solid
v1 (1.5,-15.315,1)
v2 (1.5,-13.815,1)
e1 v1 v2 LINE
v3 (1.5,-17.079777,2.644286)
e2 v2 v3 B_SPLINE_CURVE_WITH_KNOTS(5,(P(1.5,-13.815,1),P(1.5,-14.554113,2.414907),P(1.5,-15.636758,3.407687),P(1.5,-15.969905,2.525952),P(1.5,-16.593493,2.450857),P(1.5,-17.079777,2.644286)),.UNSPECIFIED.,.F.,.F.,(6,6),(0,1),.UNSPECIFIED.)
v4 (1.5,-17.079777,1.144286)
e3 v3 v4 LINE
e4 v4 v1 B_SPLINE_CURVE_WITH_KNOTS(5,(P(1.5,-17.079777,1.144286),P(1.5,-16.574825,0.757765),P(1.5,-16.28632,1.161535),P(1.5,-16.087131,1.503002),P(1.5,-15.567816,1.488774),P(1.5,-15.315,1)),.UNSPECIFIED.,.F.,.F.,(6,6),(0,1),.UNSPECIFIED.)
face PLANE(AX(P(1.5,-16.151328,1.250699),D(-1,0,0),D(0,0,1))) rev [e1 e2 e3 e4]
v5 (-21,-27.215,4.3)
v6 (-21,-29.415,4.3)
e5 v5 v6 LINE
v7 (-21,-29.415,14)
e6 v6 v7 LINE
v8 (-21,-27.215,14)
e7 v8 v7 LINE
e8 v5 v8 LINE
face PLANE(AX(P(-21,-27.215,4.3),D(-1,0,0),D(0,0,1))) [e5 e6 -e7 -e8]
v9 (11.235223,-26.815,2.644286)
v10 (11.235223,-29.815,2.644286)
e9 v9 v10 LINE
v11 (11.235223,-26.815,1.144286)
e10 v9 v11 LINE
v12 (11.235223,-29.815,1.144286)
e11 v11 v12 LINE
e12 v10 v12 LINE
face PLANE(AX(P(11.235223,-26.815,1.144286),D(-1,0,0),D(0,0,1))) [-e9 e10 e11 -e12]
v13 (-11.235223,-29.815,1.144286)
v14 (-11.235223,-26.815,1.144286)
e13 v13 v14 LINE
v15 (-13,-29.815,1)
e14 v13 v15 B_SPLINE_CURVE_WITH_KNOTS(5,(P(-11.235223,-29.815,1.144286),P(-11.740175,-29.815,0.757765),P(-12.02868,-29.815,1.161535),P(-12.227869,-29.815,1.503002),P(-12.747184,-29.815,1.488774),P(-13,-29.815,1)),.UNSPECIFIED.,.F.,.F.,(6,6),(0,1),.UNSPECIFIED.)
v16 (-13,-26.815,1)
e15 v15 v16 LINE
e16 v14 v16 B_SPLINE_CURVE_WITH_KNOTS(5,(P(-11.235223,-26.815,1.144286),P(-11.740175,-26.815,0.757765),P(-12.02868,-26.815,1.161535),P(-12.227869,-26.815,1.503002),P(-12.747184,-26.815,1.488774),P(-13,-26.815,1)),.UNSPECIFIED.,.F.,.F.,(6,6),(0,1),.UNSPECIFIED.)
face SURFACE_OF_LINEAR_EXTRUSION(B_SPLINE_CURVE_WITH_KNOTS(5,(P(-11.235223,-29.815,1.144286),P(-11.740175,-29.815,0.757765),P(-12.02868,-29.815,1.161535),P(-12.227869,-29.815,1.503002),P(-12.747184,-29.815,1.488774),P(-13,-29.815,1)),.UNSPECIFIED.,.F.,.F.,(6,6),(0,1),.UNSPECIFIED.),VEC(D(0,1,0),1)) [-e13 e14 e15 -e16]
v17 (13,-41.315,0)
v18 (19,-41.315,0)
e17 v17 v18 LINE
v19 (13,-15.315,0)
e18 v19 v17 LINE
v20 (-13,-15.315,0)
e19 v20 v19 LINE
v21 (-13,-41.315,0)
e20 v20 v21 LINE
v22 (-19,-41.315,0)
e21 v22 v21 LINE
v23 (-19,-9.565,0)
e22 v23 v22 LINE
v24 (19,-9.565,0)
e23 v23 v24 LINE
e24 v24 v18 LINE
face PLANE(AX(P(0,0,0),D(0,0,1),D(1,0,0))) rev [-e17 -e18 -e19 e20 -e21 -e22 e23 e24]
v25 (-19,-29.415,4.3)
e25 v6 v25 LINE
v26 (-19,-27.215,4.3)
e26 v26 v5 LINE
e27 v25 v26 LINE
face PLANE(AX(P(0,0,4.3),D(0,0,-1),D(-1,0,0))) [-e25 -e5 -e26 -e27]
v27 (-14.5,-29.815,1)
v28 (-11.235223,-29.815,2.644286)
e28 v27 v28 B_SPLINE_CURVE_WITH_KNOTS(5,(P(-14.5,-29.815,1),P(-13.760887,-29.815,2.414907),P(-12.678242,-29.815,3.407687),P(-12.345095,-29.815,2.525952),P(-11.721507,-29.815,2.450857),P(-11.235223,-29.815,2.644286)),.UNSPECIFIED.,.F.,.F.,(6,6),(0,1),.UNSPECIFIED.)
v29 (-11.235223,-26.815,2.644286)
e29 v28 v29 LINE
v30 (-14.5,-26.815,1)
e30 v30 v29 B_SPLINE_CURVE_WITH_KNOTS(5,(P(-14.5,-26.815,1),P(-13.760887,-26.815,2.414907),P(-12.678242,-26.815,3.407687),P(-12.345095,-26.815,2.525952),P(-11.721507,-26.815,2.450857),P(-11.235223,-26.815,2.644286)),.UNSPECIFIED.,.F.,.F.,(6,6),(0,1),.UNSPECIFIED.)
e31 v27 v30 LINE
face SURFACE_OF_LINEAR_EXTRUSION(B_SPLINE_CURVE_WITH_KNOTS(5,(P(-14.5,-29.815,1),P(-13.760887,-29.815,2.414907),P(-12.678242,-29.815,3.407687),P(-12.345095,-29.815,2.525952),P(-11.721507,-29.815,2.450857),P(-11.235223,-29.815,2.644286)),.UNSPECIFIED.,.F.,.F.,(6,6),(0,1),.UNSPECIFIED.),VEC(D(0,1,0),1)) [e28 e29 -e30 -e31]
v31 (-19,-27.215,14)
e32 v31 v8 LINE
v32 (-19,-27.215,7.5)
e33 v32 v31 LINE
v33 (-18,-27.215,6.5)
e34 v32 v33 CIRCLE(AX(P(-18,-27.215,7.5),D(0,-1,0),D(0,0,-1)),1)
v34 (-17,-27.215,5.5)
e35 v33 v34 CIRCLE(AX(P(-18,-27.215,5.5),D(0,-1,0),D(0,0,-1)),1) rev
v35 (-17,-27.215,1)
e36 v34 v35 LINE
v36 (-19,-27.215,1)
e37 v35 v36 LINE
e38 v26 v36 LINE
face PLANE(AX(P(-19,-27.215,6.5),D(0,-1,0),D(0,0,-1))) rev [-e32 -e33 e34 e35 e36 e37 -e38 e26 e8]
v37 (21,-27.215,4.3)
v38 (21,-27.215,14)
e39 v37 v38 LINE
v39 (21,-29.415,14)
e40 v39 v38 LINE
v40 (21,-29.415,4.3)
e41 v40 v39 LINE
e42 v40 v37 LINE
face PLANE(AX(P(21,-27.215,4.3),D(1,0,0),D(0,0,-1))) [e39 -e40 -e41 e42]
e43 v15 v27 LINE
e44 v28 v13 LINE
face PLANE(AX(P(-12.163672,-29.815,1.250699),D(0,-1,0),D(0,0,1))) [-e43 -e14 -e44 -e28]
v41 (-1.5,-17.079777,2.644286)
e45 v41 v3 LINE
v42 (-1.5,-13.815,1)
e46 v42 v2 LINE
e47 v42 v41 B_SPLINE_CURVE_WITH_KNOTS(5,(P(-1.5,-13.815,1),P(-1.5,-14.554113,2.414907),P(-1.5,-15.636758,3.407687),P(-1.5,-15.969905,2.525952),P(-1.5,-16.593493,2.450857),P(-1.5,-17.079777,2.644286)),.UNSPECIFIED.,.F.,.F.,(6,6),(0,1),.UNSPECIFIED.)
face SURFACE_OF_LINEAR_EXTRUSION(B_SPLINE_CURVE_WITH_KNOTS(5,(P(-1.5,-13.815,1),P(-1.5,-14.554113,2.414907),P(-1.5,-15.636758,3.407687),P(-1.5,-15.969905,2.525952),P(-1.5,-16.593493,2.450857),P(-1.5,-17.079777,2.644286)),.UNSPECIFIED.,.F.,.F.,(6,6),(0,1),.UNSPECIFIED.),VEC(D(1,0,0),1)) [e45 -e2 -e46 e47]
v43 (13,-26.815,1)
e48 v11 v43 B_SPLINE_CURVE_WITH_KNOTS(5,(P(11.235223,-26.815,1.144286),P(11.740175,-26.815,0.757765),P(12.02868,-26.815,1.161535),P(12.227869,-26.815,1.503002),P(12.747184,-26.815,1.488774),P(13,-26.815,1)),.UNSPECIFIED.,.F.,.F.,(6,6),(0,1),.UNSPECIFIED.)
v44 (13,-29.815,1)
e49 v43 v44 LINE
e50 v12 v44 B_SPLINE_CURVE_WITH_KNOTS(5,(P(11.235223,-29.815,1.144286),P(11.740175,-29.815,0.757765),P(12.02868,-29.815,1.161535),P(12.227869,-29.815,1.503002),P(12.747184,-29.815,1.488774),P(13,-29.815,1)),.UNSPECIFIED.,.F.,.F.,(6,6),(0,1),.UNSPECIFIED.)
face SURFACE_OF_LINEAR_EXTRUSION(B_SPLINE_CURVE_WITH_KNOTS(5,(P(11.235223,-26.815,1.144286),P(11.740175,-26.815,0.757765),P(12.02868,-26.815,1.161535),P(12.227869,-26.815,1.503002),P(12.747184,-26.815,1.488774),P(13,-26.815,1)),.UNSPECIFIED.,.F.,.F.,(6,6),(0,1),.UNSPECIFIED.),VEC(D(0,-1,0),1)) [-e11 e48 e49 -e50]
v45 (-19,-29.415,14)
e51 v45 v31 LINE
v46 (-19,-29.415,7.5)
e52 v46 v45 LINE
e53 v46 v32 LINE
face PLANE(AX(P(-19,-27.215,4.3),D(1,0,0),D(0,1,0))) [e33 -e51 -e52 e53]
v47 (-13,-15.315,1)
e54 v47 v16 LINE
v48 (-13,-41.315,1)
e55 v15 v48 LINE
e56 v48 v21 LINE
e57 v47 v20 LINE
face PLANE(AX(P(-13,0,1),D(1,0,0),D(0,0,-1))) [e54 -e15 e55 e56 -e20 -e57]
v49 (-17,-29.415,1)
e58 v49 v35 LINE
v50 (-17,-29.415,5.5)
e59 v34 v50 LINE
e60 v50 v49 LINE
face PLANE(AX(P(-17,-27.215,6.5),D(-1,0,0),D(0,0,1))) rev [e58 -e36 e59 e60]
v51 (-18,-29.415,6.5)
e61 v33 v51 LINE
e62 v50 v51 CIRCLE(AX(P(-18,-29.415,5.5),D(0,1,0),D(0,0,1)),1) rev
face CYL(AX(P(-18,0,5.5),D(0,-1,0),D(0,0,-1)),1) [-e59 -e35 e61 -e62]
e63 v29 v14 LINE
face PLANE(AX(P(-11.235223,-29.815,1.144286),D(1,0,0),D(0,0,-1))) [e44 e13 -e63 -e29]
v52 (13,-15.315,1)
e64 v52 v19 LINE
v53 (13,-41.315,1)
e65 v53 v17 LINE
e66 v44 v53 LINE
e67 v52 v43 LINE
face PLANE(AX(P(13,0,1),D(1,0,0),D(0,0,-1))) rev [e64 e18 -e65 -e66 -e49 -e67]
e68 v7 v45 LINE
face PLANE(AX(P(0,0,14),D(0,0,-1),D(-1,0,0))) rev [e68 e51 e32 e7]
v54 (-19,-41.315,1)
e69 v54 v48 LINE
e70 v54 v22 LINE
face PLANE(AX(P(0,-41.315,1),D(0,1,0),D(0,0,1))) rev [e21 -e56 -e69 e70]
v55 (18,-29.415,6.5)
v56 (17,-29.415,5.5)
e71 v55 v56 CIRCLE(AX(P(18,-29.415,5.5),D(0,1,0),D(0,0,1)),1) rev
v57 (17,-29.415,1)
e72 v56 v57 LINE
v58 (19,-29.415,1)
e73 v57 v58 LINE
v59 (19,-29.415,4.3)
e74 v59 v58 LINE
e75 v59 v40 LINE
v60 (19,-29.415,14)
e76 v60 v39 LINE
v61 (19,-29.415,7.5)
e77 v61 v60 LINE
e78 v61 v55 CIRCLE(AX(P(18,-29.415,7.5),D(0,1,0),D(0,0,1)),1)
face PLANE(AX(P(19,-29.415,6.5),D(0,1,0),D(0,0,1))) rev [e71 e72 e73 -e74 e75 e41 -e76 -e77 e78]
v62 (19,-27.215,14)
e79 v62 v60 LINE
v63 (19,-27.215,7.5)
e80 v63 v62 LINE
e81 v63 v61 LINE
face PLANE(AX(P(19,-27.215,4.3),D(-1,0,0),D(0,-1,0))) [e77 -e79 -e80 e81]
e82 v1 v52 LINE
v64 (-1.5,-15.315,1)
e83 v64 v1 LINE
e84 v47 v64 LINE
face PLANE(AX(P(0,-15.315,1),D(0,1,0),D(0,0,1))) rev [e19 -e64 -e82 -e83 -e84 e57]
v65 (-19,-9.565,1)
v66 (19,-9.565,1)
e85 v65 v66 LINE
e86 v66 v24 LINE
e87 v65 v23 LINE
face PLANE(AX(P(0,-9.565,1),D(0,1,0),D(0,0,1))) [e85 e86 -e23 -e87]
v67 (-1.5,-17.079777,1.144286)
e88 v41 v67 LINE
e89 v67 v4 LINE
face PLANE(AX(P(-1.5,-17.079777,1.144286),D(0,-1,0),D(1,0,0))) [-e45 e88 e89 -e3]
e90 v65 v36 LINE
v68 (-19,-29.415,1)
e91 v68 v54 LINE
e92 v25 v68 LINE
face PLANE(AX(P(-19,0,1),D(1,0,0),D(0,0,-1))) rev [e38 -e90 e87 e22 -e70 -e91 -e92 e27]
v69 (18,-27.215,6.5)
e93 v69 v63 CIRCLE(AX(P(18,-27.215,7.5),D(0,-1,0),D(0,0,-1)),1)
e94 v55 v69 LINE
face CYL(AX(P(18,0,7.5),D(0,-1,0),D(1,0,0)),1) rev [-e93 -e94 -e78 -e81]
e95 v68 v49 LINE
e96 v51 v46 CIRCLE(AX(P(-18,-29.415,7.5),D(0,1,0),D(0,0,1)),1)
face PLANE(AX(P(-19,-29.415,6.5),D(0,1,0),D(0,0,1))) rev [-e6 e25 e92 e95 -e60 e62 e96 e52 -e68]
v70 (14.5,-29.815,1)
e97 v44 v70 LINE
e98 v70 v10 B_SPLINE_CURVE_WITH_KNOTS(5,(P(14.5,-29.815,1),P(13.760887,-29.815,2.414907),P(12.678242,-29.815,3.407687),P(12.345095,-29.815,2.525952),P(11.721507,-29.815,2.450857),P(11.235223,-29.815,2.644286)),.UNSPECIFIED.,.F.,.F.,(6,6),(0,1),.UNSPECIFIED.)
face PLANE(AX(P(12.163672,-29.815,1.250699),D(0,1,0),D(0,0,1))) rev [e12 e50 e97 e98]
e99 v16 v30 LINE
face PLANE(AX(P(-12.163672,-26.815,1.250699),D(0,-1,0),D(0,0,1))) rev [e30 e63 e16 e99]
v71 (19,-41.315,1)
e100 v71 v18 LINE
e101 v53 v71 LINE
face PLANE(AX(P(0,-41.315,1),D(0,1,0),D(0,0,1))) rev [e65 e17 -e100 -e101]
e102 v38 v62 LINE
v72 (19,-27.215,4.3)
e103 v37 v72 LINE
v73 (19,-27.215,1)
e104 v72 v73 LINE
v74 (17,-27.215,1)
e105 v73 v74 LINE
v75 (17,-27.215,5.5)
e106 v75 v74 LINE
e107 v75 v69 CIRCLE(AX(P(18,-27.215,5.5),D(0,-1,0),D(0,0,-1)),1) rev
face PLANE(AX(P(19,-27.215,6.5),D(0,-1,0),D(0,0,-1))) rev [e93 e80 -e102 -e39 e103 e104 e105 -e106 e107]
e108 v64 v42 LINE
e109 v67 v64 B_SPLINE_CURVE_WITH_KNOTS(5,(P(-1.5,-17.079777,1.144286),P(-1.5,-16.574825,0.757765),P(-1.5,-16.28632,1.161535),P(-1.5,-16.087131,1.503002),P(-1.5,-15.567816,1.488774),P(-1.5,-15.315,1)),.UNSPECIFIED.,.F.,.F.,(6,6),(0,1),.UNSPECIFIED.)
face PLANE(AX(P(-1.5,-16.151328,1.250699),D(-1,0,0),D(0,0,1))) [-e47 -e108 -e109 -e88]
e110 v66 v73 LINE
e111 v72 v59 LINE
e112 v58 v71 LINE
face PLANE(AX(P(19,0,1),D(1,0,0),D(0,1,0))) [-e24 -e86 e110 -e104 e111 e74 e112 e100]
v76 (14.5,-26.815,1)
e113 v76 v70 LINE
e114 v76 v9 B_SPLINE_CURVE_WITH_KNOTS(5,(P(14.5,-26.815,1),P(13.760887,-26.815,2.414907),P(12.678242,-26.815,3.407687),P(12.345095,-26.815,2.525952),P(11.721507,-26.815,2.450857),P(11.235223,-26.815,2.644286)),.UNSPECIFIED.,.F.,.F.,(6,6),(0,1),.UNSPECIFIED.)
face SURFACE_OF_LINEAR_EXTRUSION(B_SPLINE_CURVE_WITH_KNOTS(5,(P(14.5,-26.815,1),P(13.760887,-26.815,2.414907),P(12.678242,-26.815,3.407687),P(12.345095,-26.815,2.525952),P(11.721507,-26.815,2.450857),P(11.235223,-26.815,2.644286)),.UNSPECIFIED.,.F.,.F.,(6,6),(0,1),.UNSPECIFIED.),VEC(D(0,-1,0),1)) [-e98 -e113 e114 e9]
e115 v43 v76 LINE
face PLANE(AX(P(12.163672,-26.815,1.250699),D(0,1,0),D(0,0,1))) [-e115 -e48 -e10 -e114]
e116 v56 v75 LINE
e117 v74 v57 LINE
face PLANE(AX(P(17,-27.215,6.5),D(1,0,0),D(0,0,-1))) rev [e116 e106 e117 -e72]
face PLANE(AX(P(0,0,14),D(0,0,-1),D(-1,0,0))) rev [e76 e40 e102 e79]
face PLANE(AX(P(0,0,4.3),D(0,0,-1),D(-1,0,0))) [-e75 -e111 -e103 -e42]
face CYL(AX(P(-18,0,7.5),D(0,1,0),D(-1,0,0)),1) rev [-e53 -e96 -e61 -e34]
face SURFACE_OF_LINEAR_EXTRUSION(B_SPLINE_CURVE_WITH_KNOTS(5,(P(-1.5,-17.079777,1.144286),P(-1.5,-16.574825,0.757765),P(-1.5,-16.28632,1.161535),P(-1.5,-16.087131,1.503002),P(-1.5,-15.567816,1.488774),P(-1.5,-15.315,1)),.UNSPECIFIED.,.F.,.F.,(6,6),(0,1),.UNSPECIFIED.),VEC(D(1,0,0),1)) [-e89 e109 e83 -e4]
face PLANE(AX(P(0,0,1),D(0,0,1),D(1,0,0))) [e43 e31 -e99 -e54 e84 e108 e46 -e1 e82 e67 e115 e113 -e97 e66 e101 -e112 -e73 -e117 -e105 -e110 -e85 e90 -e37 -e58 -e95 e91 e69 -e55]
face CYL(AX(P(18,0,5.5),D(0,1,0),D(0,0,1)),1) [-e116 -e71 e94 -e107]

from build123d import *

# Parameters (mm, degrees)
BOSS_EXTRUDE1_DEPTH      = 1
BOSS_EXTRUDE2_START      = -1.5
BOSS_EXTRUDE2_DEPTH      = 3
CIRPATTERN1_COUNT        = 3
CIRPATTERN1_ANGLE        = 180
SKETCH4_W                = 2
SKETCH4_H                = 2.2
BOSS_EXTRUDE3_DEPTH      = 5.5
BOSS_EXTRUDE4_DEPTH      = 7.5
BOSS_EXTRUDE4_DEPTH_BACK = 2.2
SKETCH5_W                = 2
SKETCH5_H                = 2.2
FILLET1_START            = -30
FILLET1_DEPTH            = 4
FILLET1_START_2          = -29.415
FILLET1_2_DEPTH          = 2.2


with BuildPart() as part:
    # Sketch1 → Boss-Extrude1 (new body)
    with BuildSketch(Plane.XY):
        Polygon((13, -9.565), (-13, -9.565), (-19, -9.565), (-19, -41.315), (-13, -41.315), (-13, -15.315), (13, -15.315), (13, -41.315), (19, -41.315), (19, -9.565), align=None)
    extrude(amount=BOSS_EXTRUDE1_DEPTH)

    # Boss-Extrude2: read off the stored shape, not the designer's step
    # Boss-Extrude2 outline → Boss-Extrude2 (add)
    with BuildSketch(Plane(origin=(0, -28.315, 0), x_dir=(-1, 0, 0), z_dir=(0, -1, 0)).offset(BOSS_EXTRUDE2_START)):
        with BuildLine():
            Line((-11.23522271, -2.644286359), (-11.23522271, -1.144286359))
            add(Edge.make_bspline(
                [(-11.23522271, -1.144286359), (-11.740174878, -0.757764956), (-12.028679887, -1.161534837), (-12.227869222, -1.503002268), (-12.747184273, -1.488774458), (-13, -1)],
                knots=[0, 0, 0, 0, 0, 0, 1, 1, 1, 1, 1, 1], degree=5))
            Line((-13, -1), (-14.5, -1))
            add(Edge.make_bspline(
                [(-14.5, -1), (-13.760887065, -2.414906572), (-12.67824158, -3.40768712), (-12.345095428, -2.525951835), (-11.7215069, -2.450856602), (-11.23522271, -2.644286359)],
                knots=[0, 0, 0, 0, 0, 0, 1, 1, 1, 1, 1, 1], degree=5))
        make_face()
    boss_extrude2 = extrude(amount=BOSS_EXTRUDE2_DEPTH)

    # CirPattern1: Boss-Extrude2 ×3 about axis
    cirpattern1_axis = Axis((0, -28.315, 1.05), (0, 0, 1))
    for i in range(1, CIRPATTERN1_COUNT):
        add(boss_extrude2.rotate(cirpattern1_axis, i * CIRPATTERN1_ANGLE / (CIRPATTERN1_COUNT - 1)))

    # Sketch4 → Boss-Extrude3 (add)
    with BuildSketch(Plane.XY.offset(1)):
        with Locations((-18, -28.315)):
            Rectangle(SKETCH4_W, SKETCH4_H)
        with Locations((18, -28.315)):
            Rectangle(SKETCH4_W, SKETCH4_H)
    extrude(amount=BOSS_EXTRUDE3_DEPTH)

    # Sketch5 → Boss-Extrude4 (add, two sides: drawn at the far end of the back side and taken through both)
    with BuildSketch(Plane.XY.offset(6.5).offset(-BOSS_EXTRUDE4_DEPTH_BACK)):
        with Locations((-20, -28.315)):
            Rectangle(SKETCH5_W, SKETCH5_H)
        with Locations((20, -28.315)):
            Rectangle(SKETCH5_W, SKETCH5_H)
    extrude(amount=BOSS_EXTRUDE4_DEPTH + BOSS_EXTRUDE4_DEPTH_BACK)

    # Fillet1: read off the stored shape, not the designer's step
    # Fillet1 outline → Fillet1 (cut)
    with BuildSketch(Plane(origin=(0, 0, 0), x_dir=(1, 0, 0), z_dir=(0, 1, 0)).offset(FILLET1_START)):
        with BuildLine():
            Line((17, -6.5), (18, -6.5))
            ThreePointArc((18, -6.5), (17.292893219, -6.207106781), (17, -5.5))
            Line((17, -5.5), (17, -6.5))
        make_face()
        with BuildLine():
            ThreePointArc((-17, -5.5), (-17.292893219, -6.207106781), (-18, -6.5))
            Line((-18, -6.5), (-17, -6.5))
            Line((-17, -6.5), (-17, -5.5))
        make_face()
    extrude(amount=FILLET1_DEPTH, mode=Mode.SUBTRACT)

    # Fillet1 2 outline → Fillet1 2 (add)
    with BuildSketch(Plane(origin=(0, 0, 0), x_dir=(1, 0, 0), z_dir=(0, 1, 0)).offset(FILLET1_START_2)):
        with BuildLine():
            Line((19, -6.5), (18, -6.5))
            ThreePointArc((18, -6.5), (18.707106781, -6.792893219), (19, -7.5))
            Line((19, -7.5), (19, -6.5))
        make_face()
        with BuildLine():
            ThreePointArc((-19, -7.5), (-18.707106781, -6.792893219), (-18, -6.5))
            Line((-18, -6.5), (-19, -6.5))
            Line((-19, -6.5), (-19, -7.5))
        make_face()
    extrude(amount=FILLET1_2_DEPTH)


solid = part.part
